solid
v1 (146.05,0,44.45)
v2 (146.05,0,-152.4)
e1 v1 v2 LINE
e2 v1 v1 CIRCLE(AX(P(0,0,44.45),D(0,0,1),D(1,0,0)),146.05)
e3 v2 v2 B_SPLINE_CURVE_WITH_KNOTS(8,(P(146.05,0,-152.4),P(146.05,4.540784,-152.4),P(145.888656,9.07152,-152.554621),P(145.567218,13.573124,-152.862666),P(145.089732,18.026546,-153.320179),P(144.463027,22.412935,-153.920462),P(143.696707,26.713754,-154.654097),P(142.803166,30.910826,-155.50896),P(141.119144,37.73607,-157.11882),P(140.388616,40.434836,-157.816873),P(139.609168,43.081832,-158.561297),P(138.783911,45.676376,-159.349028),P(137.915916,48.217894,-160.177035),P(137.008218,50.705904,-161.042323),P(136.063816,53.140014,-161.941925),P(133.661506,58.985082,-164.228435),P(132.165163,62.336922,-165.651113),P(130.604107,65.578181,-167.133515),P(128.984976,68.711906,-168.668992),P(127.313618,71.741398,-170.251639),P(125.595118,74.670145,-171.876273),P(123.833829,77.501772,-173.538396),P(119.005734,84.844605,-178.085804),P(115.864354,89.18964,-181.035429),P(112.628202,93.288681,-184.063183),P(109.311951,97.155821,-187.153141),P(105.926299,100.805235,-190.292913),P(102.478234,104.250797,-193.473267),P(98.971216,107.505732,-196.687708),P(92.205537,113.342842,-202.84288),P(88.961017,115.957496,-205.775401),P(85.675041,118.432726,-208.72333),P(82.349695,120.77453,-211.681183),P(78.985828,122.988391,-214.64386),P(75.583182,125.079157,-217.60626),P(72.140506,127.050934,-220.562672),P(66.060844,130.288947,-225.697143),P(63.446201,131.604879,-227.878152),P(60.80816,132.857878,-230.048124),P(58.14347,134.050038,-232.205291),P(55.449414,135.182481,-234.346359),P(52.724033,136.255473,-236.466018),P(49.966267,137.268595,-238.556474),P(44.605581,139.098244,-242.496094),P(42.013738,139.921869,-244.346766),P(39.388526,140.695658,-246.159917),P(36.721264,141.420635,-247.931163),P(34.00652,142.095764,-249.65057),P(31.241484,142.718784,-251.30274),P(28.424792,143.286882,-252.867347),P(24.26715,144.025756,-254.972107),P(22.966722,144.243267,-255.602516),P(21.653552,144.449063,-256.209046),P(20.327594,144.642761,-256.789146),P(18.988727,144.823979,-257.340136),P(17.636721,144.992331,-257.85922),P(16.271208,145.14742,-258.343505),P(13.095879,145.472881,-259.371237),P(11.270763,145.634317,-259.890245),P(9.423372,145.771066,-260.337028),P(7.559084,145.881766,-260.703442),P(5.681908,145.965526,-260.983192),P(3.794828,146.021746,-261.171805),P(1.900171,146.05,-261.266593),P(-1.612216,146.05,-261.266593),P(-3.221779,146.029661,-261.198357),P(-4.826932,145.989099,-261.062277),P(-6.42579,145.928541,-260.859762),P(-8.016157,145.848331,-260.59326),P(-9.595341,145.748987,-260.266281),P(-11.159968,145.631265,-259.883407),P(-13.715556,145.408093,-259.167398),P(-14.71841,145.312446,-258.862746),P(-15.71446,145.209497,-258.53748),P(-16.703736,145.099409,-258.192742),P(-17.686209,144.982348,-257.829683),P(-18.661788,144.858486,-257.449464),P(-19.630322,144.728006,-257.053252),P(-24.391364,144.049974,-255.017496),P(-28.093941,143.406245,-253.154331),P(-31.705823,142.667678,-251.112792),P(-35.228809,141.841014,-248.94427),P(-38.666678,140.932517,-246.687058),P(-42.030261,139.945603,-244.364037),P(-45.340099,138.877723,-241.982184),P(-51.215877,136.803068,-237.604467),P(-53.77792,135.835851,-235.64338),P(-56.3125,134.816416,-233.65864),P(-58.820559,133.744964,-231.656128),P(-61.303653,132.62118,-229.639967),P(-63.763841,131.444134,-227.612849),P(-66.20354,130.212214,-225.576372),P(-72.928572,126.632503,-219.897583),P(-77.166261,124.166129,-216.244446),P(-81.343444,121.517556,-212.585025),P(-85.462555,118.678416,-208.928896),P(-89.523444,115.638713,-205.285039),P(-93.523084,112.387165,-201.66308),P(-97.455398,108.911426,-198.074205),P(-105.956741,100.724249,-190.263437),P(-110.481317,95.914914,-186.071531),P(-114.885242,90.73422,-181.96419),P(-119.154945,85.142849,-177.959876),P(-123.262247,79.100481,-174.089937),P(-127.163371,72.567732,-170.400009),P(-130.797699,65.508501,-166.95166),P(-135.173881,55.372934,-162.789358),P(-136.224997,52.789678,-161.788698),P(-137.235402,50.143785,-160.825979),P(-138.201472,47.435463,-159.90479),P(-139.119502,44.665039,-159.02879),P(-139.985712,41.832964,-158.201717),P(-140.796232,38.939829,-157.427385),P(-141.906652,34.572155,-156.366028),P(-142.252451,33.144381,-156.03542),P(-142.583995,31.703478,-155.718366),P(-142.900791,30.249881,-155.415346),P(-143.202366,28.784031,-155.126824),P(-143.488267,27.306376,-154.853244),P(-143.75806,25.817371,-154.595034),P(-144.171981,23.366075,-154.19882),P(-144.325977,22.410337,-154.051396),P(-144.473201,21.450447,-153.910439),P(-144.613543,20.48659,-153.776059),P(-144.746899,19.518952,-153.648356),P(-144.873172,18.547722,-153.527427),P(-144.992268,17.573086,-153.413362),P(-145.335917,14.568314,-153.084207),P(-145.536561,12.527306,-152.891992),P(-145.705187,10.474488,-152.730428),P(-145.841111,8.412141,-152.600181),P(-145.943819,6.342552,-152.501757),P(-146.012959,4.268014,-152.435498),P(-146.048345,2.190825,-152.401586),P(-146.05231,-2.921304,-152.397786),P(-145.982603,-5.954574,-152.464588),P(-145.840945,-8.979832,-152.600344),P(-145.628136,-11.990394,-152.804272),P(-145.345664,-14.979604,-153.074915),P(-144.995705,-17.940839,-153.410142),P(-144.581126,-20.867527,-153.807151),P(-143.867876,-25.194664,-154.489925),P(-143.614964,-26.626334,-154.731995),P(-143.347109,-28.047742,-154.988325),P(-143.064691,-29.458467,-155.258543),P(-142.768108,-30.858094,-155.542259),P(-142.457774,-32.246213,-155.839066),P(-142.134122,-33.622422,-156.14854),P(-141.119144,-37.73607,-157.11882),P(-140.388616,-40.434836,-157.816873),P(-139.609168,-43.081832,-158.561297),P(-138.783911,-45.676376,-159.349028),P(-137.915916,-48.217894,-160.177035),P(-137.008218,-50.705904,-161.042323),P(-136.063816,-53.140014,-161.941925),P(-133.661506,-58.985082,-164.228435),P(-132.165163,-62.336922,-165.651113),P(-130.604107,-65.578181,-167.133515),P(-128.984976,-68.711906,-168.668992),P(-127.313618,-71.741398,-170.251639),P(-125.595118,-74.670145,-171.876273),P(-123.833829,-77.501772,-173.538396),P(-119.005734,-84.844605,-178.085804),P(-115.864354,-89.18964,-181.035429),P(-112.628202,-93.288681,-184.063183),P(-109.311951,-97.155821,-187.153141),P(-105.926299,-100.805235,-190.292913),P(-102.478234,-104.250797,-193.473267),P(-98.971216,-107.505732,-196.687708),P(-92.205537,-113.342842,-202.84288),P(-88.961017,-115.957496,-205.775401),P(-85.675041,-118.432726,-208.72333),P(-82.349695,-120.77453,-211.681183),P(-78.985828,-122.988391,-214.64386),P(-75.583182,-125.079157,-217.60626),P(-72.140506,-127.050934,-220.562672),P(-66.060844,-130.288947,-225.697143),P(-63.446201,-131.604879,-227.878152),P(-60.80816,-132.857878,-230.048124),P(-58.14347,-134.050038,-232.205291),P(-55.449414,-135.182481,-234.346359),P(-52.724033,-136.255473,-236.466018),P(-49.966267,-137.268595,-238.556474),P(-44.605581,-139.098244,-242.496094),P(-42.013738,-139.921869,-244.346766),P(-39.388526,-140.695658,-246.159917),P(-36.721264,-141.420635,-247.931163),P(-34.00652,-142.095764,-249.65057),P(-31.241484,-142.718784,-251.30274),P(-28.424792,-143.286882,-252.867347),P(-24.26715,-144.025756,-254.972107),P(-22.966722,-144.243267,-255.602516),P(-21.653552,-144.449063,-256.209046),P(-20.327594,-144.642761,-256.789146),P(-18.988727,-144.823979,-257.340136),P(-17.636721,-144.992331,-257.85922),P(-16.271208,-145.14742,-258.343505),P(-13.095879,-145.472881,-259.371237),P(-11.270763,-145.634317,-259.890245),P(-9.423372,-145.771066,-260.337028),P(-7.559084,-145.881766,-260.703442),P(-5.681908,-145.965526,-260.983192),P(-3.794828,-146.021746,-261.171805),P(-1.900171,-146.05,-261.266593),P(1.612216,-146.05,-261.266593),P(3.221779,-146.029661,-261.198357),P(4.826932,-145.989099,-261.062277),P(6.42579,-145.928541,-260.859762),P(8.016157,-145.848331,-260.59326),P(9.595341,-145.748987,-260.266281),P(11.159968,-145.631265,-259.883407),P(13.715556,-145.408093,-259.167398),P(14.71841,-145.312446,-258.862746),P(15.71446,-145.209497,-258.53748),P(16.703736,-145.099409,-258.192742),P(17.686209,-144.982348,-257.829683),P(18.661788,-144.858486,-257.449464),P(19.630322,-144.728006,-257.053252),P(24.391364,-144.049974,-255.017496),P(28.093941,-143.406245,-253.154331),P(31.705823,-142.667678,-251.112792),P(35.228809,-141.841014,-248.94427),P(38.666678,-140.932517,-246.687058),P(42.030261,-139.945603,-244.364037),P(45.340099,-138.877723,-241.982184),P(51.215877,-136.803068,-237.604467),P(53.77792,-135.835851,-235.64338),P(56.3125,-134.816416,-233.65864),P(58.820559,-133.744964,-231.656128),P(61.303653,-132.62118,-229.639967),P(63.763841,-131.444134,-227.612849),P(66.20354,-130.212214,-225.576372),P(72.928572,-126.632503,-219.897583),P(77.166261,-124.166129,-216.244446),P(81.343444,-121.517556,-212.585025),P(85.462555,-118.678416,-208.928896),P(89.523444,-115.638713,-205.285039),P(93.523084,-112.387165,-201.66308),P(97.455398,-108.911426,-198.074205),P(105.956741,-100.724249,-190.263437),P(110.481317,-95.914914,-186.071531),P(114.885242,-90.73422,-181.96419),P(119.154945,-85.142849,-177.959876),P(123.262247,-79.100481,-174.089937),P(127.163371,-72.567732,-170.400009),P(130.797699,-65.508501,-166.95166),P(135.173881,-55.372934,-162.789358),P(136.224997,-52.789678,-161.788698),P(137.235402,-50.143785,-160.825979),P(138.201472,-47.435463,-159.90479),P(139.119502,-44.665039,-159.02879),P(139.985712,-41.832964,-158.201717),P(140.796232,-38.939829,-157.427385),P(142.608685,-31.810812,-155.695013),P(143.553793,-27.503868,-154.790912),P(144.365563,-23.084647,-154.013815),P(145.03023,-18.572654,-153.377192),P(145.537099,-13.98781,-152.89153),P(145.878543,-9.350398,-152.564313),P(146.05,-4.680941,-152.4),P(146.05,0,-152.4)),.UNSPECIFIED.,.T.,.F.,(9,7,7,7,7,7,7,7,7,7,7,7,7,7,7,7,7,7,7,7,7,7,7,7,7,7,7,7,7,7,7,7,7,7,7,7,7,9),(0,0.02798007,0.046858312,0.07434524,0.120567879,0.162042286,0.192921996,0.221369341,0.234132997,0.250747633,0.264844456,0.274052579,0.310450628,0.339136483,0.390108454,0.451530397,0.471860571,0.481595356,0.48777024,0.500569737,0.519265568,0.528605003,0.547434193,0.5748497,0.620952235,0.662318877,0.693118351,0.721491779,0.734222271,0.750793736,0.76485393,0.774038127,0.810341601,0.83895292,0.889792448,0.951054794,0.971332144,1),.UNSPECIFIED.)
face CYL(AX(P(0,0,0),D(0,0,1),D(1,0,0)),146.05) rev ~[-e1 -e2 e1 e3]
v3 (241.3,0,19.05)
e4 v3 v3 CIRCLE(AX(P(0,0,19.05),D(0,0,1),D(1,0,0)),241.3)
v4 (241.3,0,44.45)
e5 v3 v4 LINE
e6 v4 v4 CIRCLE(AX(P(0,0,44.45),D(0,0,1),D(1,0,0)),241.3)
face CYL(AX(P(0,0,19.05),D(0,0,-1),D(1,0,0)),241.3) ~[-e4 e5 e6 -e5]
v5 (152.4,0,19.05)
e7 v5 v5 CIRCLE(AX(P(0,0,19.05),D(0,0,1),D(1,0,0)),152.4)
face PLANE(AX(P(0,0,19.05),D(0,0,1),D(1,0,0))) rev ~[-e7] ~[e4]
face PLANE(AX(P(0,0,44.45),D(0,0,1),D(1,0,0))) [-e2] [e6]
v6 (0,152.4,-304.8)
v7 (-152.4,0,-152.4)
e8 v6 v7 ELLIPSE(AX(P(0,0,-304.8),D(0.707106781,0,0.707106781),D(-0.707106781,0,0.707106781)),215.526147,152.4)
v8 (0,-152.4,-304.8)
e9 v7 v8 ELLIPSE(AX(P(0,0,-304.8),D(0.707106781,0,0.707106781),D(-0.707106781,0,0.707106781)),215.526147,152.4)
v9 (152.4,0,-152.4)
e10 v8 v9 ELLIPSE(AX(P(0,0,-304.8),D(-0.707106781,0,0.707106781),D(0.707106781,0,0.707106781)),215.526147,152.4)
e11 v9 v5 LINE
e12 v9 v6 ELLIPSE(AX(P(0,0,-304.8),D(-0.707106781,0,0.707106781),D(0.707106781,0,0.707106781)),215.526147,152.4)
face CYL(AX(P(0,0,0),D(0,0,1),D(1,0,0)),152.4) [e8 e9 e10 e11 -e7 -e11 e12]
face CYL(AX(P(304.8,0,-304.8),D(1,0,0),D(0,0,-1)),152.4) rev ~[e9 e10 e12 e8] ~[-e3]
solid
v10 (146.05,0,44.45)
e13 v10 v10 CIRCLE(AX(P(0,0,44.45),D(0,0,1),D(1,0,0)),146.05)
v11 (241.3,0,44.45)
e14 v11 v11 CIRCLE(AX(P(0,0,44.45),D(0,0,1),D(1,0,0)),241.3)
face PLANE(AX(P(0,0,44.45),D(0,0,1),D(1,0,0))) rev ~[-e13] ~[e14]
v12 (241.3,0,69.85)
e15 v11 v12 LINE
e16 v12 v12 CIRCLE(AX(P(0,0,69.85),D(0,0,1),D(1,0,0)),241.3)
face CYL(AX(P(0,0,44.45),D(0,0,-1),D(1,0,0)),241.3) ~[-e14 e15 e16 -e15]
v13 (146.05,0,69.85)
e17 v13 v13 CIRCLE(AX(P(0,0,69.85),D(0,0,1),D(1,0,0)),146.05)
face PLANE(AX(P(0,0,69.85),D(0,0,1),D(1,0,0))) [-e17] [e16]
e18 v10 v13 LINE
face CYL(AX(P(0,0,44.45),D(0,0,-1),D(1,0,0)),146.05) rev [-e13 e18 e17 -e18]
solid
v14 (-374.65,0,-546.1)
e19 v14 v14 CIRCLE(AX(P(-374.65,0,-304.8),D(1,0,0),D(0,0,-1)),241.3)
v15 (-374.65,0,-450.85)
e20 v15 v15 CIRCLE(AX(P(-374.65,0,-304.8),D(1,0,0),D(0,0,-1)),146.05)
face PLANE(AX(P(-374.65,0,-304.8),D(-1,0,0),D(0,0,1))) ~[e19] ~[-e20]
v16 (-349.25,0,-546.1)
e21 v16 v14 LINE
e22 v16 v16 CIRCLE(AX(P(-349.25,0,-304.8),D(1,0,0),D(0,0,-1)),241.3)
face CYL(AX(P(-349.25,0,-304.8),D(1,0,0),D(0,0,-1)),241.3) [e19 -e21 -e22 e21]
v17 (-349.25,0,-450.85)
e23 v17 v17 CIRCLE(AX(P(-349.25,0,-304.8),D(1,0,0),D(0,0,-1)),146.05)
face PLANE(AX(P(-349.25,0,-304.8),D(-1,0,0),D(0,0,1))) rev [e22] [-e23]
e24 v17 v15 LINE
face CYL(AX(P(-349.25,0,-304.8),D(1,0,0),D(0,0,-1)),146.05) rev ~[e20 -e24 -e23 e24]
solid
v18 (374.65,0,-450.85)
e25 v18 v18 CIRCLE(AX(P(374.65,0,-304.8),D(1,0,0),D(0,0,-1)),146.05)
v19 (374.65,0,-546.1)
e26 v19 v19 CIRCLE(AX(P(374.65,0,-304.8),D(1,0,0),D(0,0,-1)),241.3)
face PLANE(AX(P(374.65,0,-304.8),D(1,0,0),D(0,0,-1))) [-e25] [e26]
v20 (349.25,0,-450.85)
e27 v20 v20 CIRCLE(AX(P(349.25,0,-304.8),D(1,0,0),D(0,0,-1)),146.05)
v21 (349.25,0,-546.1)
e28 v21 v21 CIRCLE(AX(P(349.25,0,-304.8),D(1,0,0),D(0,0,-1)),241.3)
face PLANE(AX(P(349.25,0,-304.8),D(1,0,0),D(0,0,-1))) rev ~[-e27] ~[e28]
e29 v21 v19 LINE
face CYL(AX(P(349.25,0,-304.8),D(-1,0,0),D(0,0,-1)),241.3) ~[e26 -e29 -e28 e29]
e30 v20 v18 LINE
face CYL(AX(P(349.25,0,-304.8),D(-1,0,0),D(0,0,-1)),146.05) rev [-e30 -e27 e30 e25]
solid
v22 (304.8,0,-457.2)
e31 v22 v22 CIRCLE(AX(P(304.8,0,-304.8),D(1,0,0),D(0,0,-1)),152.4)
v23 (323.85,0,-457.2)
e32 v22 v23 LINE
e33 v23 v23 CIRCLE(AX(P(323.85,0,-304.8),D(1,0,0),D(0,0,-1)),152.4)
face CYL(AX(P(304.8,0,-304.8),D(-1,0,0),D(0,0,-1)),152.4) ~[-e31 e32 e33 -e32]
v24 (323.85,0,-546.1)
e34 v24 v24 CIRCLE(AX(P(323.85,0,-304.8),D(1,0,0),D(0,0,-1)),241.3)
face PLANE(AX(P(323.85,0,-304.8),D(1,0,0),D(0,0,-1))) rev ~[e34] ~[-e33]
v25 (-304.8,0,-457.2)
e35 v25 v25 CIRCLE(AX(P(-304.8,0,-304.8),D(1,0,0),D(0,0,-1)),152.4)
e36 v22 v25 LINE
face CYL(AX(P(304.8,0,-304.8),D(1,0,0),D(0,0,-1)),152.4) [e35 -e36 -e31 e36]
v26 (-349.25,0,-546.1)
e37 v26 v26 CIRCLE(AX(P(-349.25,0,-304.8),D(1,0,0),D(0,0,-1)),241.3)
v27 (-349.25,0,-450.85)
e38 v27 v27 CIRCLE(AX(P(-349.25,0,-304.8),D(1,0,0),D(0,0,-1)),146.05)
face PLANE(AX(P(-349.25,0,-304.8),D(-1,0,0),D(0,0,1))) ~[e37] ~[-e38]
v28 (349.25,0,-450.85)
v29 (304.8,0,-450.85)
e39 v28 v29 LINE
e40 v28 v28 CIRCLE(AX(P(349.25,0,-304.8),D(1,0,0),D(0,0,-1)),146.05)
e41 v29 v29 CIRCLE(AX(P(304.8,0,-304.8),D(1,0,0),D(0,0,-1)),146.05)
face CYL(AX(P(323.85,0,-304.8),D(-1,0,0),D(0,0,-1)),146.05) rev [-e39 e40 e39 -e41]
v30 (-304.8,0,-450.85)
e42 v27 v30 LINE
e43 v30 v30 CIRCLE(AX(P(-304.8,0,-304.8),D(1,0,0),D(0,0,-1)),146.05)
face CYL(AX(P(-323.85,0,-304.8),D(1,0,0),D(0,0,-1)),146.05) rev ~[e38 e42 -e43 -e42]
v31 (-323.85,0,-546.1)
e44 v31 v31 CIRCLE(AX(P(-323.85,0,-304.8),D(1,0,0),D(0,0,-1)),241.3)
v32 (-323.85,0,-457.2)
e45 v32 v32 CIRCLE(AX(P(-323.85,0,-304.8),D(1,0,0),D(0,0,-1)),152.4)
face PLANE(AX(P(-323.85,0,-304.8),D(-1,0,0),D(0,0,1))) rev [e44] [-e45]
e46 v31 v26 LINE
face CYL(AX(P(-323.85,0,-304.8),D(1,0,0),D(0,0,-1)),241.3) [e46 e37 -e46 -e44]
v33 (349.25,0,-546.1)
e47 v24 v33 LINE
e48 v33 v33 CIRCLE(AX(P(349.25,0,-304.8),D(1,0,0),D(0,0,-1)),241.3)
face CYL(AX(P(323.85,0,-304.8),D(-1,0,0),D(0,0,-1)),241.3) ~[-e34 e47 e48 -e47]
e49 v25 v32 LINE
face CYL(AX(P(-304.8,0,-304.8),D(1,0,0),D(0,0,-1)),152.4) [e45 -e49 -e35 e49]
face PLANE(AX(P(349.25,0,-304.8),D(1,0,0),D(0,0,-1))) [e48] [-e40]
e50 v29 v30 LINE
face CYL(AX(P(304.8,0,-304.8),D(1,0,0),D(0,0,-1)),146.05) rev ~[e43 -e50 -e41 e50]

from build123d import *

# Parameters (mm, degrees)
F0_R      = 152.4
F0_R_2    = 146.05
F1_DEPTH  = 19.05
F2_R      = 241.3
F2_R_2    = 152.4
F2_R_3    = 146.05
F3_DEPTH  = 25.4
F9_ANGLE  = 90
F11_DEPTH = 609.6
F12_REACH = 977.1532938113
F13_DEPTH = 25.4
F14_DEPTH = 25.4
F15_DEPTH = 25.4


with BuildPart() as f1:
    # F0 (on Top) → F1 (new body)
    with BuildSketch(Plane.XY):
        Circle(F0_R)
        Circle(F0_R_2, mode=Mode.SUBTRACT)
    extrude(amount=F1_DEPTH)

    # F2 (on face) → F3 (join)
    with BuildSketch(Plane.XY.offset(19.05)):
        Circle(F2_R)
        Circle(F2_R_2, mode=Mode.SUBTRACT)
        Circle(F2_R_2)
        Circle(F2_R_3, mode=Mode.SUBTRACT)
    extrude(amount=F3_DEPTH)


with BuildPart() as f7_1:
    # F7: copy of F1
    add(f1.part.moved(Location((304.8, 0, -304.8))))


with BuildPart() as f7_1_1:
    # F9: moved
    add(f7_1.part.rotate(Axis((304.8, 122.1911609173, -304.8), (0, 1, 0)), F9_ANGLE))


with BuildPart() as f10_1:
    # F10: instance of F7_1
    add(f7_1_1.part.mirror(Plane.YZ))


with BuildPart() as f7_1_2:
    add(f7_1_1.part)

    # F11 (add, through all): a face of the model
    f11_faces = [f7_1_2.faces().sort_by_distance(p)[0] for p in [
        (304.8, 0, -156.7105229381),
    ]]

    add(f10_1.part)  # F11 merges F10_1
    extrude(f11_faces, amount=F11_DEPTH)


with BuildPart() as f1_1:
    add(f1.part)

    f12_end = f7_1_2.part.faces().sort_by_distance((0, 0, -152.4))[0]
    # F0 (on Top) → F12 (join, up to a face of F7_1 that its end follows)
    with BuildSketch(Plane.XY):
        Circle(F0_R)
        Circle(F0_R_2, mode=Mode.SUBTRACT)
    f12_long = extrude(amount=-F12_REACH, mode=Mode.PRIVATE)
    add(split(f12_long, bisect_by=f12_end, keep=Keep.ALL, mode=Mode.PRIVATE).solids().sort_by_distance((-148.0894770619, 0, 0))[0])


with BuildPart() as f13:
    # F13 (new): a face of the model
    f13_faces = [f7_1_2.part.faces().sort_by_distance(p)[0] for p in [
        (349.25, 0, -70.324994652),
    ]]
    extrude(f13_faces, amount=F13_DEPTH)


with BuildPart() as f14:
    # F14 (new): a face of the model
    f14_faces = [f7_1_2.part.faces().sort_by_distance(p)[0] for p in [
        (-349.25, 0, -70.324994652),
    ]]
    extrude(f14_faces, amount=F14_DEPTH)


with BuildPart() as f15:
    # F15 (new): a face of the model
    f15_faces = [f1_1.part.faces().sort_by_distance(p)[0] for p in [
        (-234.475005348, 0, 44.45),
    ]]
    extrude(f15_faces, amount=F15_DEPTH)


solid = Compound([f7_1_2.part, f1_1.part, f13.part, f14.part, f15.part])
